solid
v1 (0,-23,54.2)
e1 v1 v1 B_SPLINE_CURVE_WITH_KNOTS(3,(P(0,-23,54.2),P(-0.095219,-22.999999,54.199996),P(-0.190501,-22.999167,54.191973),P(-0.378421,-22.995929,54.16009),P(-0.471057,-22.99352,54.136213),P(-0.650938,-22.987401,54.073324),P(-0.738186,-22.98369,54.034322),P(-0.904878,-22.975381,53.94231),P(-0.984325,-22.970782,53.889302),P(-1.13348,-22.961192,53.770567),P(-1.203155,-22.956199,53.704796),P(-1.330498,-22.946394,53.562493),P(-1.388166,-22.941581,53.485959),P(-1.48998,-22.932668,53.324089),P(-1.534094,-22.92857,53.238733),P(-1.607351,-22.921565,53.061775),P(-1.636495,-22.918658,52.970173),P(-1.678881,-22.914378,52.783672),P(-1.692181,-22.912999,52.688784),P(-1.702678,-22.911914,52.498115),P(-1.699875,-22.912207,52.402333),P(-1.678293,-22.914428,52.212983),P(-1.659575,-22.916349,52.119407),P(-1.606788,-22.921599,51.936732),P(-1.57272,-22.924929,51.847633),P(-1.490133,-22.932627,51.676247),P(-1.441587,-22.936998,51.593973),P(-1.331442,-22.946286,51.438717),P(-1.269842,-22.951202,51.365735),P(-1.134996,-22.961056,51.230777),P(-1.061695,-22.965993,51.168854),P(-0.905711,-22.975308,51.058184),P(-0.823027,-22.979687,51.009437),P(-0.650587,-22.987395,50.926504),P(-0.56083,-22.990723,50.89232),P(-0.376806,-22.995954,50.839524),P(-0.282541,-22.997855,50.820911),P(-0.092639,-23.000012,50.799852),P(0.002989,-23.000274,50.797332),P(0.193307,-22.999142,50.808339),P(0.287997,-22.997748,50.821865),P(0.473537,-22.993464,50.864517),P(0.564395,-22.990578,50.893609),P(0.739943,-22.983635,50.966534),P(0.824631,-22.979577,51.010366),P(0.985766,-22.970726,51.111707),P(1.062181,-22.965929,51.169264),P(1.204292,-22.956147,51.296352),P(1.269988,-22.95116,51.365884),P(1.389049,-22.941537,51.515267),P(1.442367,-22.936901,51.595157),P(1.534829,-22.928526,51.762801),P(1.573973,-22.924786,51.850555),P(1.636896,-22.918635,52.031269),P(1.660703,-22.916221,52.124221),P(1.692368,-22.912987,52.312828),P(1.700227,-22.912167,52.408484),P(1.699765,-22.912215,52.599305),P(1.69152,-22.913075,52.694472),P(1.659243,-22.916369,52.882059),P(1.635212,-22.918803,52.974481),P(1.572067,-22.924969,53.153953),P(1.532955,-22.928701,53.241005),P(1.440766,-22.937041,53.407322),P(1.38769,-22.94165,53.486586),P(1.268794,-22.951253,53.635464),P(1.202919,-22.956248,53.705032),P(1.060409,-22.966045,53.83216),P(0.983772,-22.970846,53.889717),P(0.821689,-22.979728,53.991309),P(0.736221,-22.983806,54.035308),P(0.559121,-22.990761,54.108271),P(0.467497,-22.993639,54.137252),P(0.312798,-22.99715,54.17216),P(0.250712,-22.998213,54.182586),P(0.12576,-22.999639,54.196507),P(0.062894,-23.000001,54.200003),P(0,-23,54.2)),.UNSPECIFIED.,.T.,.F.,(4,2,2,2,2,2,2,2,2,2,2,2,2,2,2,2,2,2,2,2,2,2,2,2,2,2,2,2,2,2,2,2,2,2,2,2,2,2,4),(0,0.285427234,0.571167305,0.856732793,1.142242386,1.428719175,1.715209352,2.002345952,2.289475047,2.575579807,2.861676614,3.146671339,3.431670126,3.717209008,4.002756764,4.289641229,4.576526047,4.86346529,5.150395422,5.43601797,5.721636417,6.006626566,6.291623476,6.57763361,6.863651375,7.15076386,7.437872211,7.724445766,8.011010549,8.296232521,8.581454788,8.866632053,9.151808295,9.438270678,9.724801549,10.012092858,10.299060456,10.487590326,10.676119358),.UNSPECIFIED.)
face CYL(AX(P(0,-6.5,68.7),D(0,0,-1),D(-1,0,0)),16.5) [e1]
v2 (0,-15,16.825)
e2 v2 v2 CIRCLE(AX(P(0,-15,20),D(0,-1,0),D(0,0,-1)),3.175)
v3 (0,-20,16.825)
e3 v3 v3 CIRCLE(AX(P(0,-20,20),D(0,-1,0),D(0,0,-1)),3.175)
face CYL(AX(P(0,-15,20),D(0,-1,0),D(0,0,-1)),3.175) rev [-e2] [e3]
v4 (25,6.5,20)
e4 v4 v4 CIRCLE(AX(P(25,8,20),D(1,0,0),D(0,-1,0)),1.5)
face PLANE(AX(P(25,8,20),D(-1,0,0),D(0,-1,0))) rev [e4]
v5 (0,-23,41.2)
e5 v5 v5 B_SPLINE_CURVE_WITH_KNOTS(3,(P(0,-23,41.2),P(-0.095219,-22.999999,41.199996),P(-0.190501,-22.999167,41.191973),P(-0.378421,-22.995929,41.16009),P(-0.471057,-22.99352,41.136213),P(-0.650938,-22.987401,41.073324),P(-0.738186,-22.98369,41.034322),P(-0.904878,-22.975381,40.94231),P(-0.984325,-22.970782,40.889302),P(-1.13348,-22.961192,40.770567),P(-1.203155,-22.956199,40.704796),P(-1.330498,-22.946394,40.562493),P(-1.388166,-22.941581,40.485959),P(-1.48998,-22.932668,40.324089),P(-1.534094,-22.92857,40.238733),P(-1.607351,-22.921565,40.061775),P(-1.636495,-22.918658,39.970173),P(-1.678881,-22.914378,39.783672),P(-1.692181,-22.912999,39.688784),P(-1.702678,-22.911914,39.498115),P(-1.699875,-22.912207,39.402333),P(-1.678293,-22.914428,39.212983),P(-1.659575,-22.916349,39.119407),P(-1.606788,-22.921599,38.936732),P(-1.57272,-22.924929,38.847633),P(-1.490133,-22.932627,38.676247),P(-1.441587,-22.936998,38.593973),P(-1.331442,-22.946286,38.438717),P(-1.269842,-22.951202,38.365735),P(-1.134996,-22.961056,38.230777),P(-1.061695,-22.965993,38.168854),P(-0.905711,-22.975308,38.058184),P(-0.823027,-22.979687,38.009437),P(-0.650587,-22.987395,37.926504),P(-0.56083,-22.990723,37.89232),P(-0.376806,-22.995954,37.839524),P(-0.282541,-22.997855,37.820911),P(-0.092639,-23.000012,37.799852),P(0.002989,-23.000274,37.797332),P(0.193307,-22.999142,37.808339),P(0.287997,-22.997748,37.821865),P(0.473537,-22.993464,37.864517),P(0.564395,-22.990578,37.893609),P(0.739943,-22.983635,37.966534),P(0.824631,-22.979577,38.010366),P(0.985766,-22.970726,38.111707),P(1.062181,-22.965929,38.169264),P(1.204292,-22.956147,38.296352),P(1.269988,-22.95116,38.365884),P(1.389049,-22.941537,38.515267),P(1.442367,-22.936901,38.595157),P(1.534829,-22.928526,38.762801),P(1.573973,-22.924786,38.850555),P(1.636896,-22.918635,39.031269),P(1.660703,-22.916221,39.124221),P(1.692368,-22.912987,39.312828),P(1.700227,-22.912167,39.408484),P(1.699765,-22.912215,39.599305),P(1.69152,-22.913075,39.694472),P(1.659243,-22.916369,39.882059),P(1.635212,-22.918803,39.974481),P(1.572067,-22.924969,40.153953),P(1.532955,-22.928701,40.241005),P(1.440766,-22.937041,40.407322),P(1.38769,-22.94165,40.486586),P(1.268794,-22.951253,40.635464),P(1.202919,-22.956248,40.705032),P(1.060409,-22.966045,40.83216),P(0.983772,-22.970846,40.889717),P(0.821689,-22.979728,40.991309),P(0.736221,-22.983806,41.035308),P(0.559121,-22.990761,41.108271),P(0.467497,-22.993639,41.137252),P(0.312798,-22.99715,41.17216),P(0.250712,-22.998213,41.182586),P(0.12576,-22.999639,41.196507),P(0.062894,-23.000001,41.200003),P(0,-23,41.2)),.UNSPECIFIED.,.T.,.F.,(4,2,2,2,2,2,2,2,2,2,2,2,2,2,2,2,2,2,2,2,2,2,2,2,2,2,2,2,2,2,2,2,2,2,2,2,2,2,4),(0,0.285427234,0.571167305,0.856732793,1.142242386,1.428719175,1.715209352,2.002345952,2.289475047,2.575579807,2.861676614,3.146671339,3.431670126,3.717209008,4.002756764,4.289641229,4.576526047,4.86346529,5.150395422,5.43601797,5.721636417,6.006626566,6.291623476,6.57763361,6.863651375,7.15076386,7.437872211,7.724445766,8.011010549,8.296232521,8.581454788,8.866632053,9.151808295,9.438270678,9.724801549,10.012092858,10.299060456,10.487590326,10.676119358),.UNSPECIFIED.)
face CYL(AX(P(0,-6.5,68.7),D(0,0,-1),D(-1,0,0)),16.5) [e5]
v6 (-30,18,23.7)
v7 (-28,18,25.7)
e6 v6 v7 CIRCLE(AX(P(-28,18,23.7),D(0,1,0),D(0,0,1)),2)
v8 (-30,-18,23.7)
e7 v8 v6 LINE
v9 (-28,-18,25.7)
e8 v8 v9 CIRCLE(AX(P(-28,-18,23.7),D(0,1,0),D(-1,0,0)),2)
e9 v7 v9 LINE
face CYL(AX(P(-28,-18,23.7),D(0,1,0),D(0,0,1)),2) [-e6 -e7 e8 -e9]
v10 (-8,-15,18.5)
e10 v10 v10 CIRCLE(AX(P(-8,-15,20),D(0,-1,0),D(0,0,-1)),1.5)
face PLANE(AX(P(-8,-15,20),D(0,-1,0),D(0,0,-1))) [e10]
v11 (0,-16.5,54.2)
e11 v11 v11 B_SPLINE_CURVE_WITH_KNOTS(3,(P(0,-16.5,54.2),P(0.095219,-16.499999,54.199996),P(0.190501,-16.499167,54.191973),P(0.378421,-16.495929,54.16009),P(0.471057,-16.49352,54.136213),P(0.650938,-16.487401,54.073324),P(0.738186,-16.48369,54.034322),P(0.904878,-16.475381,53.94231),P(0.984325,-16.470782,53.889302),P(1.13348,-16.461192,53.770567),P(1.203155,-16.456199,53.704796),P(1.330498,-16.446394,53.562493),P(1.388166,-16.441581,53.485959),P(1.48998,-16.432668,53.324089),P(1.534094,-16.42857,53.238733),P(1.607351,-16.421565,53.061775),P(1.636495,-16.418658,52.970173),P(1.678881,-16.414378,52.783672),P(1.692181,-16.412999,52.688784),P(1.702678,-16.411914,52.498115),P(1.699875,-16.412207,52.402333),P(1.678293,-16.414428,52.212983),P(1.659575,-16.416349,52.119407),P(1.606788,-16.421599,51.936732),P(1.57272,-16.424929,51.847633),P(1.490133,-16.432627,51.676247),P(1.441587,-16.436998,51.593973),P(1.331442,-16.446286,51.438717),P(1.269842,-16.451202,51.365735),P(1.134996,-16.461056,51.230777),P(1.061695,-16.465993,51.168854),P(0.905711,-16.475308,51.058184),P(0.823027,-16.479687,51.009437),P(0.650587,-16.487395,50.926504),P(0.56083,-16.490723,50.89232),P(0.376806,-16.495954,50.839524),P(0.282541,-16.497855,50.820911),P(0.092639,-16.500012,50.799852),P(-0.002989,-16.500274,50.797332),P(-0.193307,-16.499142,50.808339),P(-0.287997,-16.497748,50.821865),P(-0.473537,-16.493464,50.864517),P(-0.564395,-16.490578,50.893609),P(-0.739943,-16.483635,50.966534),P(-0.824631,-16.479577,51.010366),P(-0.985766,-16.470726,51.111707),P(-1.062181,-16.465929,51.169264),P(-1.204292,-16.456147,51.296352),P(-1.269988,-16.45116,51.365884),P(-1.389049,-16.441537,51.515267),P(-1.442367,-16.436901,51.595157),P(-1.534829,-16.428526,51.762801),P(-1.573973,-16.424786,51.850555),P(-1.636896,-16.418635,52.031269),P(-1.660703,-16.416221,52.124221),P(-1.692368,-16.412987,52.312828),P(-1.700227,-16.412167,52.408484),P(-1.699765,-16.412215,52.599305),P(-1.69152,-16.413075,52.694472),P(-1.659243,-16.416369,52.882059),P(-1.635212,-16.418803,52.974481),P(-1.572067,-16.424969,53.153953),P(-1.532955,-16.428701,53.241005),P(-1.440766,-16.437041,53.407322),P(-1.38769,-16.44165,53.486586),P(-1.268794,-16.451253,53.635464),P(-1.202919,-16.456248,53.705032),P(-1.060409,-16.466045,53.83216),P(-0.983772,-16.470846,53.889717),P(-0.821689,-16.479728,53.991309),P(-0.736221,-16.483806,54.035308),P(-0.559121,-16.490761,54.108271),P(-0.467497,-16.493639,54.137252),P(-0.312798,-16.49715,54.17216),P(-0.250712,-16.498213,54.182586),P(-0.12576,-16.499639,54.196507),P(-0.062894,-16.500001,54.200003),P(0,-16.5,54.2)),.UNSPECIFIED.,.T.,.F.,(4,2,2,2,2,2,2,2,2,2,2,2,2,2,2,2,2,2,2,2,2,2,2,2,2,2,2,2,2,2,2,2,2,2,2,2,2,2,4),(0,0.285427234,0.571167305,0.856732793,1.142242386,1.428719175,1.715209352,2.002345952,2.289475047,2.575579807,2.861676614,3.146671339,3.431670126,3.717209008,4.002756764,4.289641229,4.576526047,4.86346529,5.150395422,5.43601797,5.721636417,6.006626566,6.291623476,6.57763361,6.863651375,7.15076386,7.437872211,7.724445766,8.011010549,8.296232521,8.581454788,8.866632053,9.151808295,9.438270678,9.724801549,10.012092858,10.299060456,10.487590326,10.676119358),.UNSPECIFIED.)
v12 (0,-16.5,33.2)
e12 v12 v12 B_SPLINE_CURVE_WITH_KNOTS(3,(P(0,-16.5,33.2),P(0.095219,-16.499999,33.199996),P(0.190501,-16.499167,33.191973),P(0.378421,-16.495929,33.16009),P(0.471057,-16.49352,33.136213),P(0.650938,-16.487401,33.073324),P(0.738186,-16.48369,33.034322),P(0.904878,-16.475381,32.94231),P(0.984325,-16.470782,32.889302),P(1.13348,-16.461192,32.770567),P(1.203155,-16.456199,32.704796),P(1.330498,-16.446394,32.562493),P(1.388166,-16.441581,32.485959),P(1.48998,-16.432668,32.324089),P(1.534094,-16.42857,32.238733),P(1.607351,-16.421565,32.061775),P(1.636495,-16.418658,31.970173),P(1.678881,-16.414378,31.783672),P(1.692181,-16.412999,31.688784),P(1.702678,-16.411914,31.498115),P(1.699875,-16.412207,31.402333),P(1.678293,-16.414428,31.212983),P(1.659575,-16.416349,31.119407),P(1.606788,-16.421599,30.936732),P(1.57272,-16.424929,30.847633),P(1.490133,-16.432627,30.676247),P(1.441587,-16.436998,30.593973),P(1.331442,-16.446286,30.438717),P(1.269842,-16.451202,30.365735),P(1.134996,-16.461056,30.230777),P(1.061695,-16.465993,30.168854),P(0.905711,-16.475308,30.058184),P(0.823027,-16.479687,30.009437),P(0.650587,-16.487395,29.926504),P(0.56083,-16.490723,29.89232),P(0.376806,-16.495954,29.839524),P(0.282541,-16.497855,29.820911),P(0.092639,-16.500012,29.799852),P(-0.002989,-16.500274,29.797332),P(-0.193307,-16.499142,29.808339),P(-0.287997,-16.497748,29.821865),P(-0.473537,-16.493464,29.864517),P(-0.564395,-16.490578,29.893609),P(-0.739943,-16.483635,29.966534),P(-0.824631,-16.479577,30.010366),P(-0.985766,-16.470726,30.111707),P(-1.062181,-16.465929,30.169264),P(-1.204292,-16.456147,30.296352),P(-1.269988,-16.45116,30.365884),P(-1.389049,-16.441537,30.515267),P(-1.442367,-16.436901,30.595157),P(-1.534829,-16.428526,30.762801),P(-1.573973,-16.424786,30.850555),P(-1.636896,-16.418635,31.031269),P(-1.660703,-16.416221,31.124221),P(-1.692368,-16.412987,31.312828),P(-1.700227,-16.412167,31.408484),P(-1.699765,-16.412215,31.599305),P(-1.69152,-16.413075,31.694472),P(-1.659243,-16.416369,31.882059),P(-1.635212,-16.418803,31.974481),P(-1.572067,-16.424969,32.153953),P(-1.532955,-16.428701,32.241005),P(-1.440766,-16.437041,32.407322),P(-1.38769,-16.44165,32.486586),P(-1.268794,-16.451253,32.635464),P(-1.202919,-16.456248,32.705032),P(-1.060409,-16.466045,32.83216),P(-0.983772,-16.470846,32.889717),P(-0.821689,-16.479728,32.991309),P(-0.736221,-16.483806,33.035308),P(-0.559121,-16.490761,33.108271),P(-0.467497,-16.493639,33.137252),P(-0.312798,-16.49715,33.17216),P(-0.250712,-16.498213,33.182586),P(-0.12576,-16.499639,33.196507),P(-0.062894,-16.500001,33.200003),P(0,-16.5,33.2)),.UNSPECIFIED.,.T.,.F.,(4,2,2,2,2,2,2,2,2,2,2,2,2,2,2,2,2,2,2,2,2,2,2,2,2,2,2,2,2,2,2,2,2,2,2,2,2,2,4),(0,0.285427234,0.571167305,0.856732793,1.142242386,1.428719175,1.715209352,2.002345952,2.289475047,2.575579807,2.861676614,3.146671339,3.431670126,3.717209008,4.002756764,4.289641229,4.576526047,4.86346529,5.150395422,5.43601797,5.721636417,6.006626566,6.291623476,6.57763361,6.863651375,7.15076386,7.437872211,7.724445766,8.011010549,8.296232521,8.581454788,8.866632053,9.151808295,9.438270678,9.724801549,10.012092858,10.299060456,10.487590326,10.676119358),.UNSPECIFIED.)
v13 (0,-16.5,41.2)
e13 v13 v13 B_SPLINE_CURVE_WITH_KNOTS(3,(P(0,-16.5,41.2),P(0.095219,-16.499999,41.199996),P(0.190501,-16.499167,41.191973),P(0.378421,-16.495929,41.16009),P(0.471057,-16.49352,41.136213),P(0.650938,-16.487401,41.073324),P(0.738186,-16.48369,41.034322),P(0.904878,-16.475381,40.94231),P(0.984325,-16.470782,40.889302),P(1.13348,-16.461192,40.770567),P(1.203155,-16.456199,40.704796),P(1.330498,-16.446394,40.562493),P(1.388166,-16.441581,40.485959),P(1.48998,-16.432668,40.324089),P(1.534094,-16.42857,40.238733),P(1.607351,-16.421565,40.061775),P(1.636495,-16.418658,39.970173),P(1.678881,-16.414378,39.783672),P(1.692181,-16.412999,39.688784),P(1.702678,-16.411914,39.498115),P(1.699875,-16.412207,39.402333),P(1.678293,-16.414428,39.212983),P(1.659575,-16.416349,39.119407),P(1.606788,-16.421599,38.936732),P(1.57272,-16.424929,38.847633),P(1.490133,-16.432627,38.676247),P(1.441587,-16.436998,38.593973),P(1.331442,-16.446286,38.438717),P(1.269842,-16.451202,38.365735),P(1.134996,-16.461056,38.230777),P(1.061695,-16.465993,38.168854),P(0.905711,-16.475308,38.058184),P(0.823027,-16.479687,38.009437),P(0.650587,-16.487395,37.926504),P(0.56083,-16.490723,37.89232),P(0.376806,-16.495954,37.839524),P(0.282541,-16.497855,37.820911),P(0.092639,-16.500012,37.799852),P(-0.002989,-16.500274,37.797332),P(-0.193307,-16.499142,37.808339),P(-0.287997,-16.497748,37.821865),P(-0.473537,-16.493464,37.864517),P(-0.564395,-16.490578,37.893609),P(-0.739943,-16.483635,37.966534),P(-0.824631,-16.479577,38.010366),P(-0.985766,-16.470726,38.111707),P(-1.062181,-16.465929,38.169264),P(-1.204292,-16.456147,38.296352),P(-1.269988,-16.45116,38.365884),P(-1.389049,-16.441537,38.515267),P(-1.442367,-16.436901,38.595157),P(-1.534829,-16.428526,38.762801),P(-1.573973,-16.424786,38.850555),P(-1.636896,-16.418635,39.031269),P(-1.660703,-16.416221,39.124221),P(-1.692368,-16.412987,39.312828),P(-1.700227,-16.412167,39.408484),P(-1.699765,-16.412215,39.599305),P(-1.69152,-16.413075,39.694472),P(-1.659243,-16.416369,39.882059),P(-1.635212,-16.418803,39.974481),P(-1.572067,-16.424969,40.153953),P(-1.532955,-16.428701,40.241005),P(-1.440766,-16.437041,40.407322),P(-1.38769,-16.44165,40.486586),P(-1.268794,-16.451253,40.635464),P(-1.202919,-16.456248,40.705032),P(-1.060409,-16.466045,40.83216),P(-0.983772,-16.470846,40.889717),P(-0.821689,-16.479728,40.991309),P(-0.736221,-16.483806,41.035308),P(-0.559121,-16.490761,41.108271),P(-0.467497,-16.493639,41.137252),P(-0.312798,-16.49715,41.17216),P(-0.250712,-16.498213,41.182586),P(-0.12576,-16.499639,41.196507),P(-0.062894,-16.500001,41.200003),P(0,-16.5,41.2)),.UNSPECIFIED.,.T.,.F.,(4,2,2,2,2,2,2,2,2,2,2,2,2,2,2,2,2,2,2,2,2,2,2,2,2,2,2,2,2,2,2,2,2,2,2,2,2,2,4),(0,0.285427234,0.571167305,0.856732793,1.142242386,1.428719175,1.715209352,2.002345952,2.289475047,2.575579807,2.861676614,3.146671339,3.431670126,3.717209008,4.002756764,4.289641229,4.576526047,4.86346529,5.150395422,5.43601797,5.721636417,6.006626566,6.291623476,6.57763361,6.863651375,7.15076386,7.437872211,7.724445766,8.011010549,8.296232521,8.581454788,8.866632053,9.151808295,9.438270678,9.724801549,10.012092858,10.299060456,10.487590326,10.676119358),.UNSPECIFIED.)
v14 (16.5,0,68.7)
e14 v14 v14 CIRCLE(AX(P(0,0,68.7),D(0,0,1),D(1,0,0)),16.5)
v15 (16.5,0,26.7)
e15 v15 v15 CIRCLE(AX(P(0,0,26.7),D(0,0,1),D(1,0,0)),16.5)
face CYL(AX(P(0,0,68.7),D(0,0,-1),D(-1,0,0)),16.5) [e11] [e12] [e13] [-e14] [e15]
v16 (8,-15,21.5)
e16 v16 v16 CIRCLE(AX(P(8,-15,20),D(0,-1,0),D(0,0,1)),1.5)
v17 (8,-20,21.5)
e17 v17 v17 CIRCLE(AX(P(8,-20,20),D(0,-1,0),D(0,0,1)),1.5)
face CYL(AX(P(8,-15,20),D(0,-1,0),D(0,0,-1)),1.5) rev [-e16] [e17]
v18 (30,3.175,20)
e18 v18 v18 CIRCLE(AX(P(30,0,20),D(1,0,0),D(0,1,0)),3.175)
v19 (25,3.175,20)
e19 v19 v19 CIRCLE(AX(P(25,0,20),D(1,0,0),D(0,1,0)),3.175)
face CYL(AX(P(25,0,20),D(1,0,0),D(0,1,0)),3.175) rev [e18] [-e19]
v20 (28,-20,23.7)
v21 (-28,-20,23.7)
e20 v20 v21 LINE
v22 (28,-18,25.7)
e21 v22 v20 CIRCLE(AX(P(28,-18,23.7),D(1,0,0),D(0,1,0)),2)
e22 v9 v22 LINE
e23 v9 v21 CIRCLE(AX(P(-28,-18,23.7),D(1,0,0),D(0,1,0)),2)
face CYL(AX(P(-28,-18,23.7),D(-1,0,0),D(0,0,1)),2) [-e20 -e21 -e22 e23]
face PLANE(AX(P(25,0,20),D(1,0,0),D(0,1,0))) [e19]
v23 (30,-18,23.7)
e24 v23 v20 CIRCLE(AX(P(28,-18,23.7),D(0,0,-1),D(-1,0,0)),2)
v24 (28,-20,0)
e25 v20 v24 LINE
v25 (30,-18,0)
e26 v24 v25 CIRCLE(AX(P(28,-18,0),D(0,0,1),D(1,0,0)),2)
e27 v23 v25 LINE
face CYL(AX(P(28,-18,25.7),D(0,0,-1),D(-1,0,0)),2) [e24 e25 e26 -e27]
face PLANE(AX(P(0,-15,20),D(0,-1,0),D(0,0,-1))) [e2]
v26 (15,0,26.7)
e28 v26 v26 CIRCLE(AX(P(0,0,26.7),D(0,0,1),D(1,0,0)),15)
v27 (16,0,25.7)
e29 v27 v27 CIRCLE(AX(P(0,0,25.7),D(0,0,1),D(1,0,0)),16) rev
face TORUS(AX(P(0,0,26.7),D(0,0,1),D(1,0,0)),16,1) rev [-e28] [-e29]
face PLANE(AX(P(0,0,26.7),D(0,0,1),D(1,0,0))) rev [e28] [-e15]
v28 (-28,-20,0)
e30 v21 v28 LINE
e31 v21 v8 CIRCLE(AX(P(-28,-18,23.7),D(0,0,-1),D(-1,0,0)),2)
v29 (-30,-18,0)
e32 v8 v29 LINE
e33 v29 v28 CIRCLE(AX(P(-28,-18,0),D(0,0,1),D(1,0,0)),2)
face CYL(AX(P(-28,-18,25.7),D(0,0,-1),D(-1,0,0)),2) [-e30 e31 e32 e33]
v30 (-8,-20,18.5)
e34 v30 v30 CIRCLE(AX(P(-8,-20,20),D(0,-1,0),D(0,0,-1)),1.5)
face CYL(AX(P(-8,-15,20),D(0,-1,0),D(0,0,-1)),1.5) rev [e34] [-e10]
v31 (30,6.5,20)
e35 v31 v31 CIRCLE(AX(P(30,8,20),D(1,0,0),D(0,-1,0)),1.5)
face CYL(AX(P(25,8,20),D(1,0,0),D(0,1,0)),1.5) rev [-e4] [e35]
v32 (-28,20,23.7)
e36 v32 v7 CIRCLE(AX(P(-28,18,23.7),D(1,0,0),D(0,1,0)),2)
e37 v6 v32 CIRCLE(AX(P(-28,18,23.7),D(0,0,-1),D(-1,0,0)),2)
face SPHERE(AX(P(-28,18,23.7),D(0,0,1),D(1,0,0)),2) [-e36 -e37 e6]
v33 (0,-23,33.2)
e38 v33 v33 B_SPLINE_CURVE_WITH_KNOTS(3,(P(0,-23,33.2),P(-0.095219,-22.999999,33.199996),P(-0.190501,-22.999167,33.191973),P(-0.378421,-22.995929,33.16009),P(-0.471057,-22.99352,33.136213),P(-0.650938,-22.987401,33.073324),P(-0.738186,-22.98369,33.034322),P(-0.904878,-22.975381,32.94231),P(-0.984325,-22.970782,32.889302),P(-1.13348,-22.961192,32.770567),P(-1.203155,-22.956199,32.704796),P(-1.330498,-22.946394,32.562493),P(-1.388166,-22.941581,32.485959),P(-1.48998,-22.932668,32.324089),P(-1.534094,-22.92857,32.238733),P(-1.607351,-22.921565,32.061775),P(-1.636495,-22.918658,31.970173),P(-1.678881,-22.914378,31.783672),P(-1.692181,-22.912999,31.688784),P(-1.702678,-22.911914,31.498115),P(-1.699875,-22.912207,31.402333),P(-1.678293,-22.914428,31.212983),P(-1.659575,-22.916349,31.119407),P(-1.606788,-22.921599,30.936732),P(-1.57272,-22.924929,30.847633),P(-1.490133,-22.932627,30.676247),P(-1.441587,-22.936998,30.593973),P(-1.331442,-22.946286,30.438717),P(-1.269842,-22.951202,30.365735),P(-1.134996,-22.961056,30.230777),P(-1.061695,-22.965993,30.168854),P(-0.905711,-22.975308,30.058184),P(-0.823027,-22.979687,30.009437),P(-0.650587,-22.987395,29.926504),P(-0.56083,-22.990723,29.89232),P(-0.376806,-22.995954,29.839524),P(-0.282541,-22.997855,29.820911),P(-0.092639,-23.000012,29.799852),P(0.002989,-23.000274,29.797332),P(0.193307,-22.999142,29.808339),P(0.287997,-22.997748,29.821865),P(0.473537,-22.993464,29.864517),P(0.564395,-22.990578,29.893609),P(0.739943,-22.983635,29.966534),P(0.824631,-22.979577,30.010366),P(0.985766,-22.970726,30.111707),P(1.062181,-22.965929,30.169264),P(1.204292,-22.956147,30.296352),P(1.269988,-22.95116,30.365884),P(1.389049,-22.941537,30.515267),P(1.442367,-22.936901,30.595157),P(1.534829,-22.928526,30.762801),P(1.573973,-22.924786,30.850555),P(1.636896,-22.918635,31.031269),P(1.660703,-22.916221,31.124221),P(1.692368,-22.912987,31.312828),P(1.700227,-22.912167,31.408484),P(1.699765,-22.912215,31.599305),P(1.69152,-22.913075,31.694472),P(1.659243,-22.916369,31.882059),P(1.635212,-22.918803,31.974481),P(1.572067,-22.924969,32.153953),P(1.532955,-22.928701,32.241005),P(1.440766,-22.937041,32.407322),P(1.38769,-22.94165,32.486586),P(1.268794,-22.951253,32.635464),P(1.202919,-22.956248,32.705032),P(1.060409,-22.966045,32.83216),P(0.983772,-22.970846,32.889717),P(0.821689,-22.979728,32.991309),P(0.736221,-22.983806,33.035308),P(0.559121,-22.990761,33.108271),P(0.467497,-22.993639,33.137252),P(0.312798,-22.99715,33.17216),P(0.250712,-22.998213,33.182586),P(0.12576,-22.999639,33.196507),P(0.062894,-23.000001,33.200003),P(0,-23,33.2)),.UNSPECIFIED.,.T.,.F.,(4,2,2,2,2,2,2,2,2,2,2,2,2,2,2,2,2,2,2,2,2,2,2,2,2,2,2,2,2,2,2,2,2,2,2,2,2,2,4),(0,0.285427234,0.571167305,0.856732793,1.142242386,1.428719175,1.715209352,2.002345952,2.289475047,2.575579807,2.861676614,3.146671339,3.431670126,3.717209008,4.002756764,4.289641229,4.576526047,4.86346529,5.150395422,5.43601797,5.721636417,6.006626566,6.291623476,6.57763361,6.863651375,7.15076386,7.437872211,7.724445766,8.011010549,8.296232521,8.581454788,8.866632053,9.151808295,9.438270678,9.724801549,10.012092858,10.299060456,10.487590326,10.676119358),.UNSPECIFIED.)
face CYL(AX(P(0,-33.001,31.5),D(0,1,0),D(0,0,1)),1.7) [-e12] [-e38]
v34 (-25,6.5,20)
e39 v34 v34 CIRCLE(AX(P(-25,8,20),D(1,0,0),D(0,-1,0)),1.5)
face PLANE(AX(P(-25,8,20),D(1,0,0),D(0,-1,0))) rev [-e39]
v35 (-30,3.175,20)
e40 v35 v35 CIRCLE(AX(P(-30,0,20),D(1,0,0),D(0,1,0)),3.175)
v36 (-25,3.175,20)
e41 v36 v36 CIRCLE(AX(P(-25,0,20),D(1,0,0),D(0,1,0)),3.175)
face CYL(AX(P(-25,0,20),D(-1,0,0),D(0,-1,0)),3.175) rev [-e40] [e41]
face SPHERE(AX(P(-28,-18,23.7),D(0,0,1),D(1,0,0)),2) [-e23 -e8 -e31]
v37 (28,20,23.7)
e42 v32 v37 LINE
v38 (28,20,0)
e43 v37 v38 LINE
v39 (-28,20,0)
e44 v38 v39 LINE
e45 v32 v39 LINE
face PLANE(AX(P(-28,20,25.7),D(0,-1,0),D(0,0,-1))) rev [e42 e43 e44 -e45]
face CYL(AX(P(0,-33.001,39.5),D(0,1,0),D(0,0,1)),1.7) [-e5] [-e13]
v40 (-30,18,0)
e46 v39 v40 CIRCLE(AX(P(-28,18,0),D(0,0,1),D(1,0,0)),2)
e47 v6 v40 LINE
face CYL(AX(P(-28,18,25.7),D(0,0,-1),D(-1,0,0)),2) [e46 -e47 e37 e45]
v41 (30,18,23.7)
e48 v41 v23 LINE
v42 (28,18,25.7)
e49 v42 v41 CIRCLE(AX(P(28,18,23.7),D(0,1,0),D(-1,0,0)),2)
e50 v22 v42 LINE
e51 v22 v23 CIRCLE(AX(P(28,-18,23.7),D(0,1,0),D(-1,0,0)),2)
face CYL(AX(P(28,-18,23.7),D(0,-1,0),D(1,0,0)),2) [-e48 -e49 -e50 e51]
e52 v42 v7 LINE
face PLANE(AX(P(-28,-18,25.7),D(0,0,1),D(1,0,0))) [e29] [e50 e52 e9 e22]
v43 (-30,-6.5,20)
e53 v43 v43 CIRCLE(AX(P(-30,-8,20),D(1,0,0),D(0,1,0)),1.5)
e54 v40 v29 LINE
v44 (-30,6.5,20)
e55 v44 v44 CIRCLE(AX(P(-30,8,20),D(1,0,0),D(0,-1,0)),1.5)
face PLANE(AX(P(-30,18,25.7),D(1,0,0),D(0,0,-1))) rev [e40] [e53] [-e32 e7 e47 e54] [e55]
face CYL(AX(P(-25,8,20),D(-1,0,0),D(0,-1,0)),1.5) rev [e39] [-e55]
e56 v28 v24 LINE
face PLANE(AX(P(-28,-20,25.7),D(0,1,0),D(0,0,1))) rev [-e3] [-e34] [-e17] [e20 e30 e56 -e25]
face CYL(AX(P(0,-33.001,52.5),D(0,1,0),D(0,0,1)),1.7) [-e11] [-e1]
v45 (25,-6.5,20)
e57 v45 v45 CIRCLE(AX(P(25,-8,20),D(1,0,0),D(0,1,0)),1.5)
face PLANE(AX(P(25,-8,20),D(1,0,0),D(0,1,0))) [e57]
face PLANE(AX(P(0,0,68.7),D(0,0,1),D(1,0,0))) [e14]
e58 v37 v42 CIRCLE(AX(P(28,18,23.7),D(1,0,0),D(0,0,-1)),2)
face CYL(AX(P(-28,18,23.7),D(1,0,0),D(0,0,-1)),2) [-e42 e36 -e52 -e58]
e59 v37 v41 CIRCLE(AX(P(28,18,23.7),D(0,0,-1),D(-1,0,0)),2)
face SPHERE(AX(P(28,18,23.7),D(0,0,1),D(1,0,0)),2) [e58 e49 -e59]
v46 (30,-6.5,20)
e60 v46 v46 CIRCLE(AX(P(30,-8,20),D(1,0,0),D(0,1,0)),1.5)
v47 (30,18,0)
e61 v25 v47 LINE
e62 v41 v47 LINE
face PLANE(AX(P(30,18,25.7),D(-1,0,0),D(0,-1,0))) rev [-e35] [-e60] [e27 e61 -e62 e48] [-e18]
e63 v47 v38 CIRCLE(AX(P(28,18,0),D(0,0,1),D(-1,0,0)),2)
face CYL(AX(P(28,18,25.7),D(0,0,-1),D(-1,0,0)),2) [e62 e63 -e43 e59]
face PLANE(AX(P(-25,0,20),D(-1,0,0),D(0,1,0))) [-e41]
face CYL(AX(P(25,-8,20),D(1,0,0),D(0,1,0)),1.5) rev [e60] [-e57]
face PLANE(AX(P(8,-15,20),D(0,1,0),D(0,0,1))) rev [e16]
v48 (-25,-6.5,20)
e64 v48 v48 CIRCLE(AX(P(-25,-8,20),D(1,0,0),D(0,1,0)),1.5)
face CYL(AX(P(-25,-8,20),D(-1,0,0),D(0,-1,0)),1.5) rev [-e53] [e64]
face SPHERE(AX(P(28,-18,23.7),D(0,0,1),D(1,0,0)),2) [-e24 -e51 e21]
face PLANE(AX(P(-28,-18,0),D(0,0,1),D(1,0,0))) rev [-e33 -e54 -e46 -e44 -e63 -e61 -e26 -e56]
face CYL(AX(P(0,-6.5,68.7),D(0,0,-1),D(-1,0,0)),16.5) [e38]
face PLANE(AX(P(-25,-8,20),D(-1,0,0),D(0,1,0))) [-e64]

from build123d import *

# Parameters (mm, degrees)
BOSS_EXTRUDE1_DEPTH      = 25.7
SKETCH2_R                = 15
BOSS_EXTRUDE2_DEPTH      = 1
FILLET1_R                = 1
FILLET2_R                = 2
SKETCH3_R                = 16.5
BOSS_EXTRUDE3_DEPTH      = 42
SKETCH4_R                = 3.175
SKETCH4_R_2              = 1.5
CUT_EXTRUDE1_DEPTH       = 5
BOSS_EXTRUDE4_REACH      = 79.587
BOSS_EXTRUDE4_END_RADIUS = 16.5
SKETCH5_R                = 1.7
SKETCH6_R                = 3.175
SKETCH6_R_2              = 1.5
CUT_EXTRUDE2_DEPTH       = 5


with BuildPart() as part:
    # Sketch1 → Boss-Extrude1 (new body)
    with BuildSketch(Plane.XY):
        with BuildLine():
            Line((-28, 20), (28, 20))
            ThreePointArc((28, 20), (29.414213562, 19.414213562), (30, 18))
            Line((30, 18), (30, -18))
            ThreePointArc((30, -18), (29.414213562, -19.414213562), (28, -20))
            Line((28, -20), (-28, -20))
            ThreePointArc((-28, -20), (-29.414213562, -19.414213562), (-30, -18))
            Line((-30, -18), (-30, 18))
            ThreePointArc((-30, 18), (-29.414213562, 19.414213562), (-28, 20))
        make_face()
    extrude(amount=BOSS_EXTRUDE1_DEPTH)

    # Sketch2 → Boss-Extrude2 (add)
    with BuildSketch(Plane.XY.offset(25.7)):
        Circle(SKETCH2_R)
    extrude(amount=BOSS_EXTRUDE2_DEPTH)

    # Fillet1
    fillet1_edges = [part.edges().sort_by_distance(p)[0] for p in [
        (-15, 0, 25.7),
    ]]
    fillet(fillet1_edges, radius=FILLET1_R - 0.0001)  # a hair under: the kernel refuses the full size

    # Fillet2
    fillet2_edges = [part.edges().sort_by_distance(p)[0] for p in [
        (29.414213562, -19.414213562, 25.7),
        (30, 0, 25.7),
        (29.414213562, 19.414213562, 25.7),
        (0, 20, 25.7),
        (-29.414213562, 19.414213562, 25.7),
        (-30, 0, 25.7),
        (-29.414213562, -19.414213562, 25.7),
        (0, -20, 25.7),
    ]]
    fillet(fillet2_edges, radius=FILLET2_R)

    # Sketch3 → Boss-Extrude3 (add)
    with BuildSketch(Plane.XY.offset(26.7)):
        with Locations(Location((0, 0, 0), (0, 0, 180))):
            Circle(SKETCH3_R)
    extrude(amount=BOSS_EXTRUDE3_DEPTH)

    # Sketch4 → Cut-Extrude1 (cut)
    with BuildSketch(Plane.XZ.offset(20)):
        with Locations(Location((0, 20, 0), (0, 0, 270))):
            Circle(SKETCH4_R)
        with Locations(Location((-8, 20, 0), (0, 0, 270))):
            Circle(SKETCH4_R_2)
        with Locations(Location((8, 20, 0), (0, 0, 90))):
            Circle(SKETCH4_R_2)
    extrude(amount=-CUT_EXTRUDE1_DEPTH, mode=Mode.SUBTRACT)

    # Boss-Extrude4: up to this cylinder (the profile starts inside it)
    boss_extrude4_end = Plane(origin=(0, -6.5, 42), z_dir=(0, 0, -1)) * Cylinder(BOSS_EXTRUDE4_END_RADIUS, 214.174, mode=Mode.PRIVATE)
    # Sketch5 → Boss-Extrude4 (add, up to the surface)
    with BuildSketch(Plane(origin=(0, 0, 0), x_dir=(1, 0, 0), z_dir=(0, 1, 0)), mode=Mode.PRIVATE) as boss_extrude4_sk1:
        with Locations(Location((0, -31.5, 0), (0, 0, 270))):
            Circle(SKETCH5_R)
    boss_extrude4_tool1 = extrude(boss_extrude4_sk1.sketch, amount=-BOSS_EXTRUDE4_REACH, mode=Mode.PRIVATE) & boss_extrude4_end
    add(boss_extrude4_tool1.solids().sort_by_distance((0, 0, 31.5))[0])
    # Sketch5 → Boss-Extrude4 (add, up to the surface)
    with BuildSketch(Plane(origin=(0, 0, 0), x_dir=(1, 0, 0), z_dir=(0, 1, 0)), mode=Mode.PRIVATE) as boss_extrude4_sk2:
        with Locations(Location((0, -39.5, 0), (0, 0, 270))):
            Circle(SKETCH5_R)
    boss_extrude4_tool2 = extrude(boss_extrude4_sk2.sketch, amount=-BOSS_EXTRUDE4_REACH, mode=Mode.PRIVATE) & boss_extrude4_end
    add(boss_extrude4_tool2.solids().sort_by_distance((0, 0, 39.5))[0])
    # Sketch5 → Boss-Extrude4 (add, up to the surface)
    with BuildSketch(Plane(origin=(0, 0, 0), x_dir=(1, 0, 0), z_dir=(0, 1, 0)), mode=Mode.PRIVATE) as boss_extrude4_sk3:
        with Locations(Location((0, -52.5, 0), (0, 0, 270))):
            Circle(SKETCH5_R)
    boss_extrude4_tool3 = extrude(boss_extrude4_sk3.sketch, amount=-BOSS_EXTRUDE4_REACH, mode=Mode.PRIVATE) & boss_extrude4_end
    add(boss_extrude4_tool3.solids().sort_by_distance((0, 0, 52.5))[0])

    # Sketch6 → Cut-Extrude2 (cut)
    with BuildSketch(Plane(origin=(30, 0, 0), x_dir=(0, 0, -1), z_dir=(1, 0, 0))):
        with Locations(Location((-20, 0, 0), (0, 0, 90))):
            Circle(SKETCH6_R)
        with Locations(Location((-20, -8, 0), (0, 0, 90))):
            Circle(SKETCH6_R_2)
        with Locations(Location((-20, 8, 0), (0, 0, 270))):
            Circle(SKETCH6_R_2)
    cut_extrude2 = extrude(amount=-CUT_EXTRUDE2_DEPTH, mode=Mode.SUBTRACT)

    # Mirror1: Cut-Extrude2 across plane
    add(cut_extrude2.mirror(Plane(origin=(0, 0, 0), x_dir=(0, 0, 1), z_dir=(1, 0, 0))), mode=Mode.SUBTRACT)


solid = part.part
